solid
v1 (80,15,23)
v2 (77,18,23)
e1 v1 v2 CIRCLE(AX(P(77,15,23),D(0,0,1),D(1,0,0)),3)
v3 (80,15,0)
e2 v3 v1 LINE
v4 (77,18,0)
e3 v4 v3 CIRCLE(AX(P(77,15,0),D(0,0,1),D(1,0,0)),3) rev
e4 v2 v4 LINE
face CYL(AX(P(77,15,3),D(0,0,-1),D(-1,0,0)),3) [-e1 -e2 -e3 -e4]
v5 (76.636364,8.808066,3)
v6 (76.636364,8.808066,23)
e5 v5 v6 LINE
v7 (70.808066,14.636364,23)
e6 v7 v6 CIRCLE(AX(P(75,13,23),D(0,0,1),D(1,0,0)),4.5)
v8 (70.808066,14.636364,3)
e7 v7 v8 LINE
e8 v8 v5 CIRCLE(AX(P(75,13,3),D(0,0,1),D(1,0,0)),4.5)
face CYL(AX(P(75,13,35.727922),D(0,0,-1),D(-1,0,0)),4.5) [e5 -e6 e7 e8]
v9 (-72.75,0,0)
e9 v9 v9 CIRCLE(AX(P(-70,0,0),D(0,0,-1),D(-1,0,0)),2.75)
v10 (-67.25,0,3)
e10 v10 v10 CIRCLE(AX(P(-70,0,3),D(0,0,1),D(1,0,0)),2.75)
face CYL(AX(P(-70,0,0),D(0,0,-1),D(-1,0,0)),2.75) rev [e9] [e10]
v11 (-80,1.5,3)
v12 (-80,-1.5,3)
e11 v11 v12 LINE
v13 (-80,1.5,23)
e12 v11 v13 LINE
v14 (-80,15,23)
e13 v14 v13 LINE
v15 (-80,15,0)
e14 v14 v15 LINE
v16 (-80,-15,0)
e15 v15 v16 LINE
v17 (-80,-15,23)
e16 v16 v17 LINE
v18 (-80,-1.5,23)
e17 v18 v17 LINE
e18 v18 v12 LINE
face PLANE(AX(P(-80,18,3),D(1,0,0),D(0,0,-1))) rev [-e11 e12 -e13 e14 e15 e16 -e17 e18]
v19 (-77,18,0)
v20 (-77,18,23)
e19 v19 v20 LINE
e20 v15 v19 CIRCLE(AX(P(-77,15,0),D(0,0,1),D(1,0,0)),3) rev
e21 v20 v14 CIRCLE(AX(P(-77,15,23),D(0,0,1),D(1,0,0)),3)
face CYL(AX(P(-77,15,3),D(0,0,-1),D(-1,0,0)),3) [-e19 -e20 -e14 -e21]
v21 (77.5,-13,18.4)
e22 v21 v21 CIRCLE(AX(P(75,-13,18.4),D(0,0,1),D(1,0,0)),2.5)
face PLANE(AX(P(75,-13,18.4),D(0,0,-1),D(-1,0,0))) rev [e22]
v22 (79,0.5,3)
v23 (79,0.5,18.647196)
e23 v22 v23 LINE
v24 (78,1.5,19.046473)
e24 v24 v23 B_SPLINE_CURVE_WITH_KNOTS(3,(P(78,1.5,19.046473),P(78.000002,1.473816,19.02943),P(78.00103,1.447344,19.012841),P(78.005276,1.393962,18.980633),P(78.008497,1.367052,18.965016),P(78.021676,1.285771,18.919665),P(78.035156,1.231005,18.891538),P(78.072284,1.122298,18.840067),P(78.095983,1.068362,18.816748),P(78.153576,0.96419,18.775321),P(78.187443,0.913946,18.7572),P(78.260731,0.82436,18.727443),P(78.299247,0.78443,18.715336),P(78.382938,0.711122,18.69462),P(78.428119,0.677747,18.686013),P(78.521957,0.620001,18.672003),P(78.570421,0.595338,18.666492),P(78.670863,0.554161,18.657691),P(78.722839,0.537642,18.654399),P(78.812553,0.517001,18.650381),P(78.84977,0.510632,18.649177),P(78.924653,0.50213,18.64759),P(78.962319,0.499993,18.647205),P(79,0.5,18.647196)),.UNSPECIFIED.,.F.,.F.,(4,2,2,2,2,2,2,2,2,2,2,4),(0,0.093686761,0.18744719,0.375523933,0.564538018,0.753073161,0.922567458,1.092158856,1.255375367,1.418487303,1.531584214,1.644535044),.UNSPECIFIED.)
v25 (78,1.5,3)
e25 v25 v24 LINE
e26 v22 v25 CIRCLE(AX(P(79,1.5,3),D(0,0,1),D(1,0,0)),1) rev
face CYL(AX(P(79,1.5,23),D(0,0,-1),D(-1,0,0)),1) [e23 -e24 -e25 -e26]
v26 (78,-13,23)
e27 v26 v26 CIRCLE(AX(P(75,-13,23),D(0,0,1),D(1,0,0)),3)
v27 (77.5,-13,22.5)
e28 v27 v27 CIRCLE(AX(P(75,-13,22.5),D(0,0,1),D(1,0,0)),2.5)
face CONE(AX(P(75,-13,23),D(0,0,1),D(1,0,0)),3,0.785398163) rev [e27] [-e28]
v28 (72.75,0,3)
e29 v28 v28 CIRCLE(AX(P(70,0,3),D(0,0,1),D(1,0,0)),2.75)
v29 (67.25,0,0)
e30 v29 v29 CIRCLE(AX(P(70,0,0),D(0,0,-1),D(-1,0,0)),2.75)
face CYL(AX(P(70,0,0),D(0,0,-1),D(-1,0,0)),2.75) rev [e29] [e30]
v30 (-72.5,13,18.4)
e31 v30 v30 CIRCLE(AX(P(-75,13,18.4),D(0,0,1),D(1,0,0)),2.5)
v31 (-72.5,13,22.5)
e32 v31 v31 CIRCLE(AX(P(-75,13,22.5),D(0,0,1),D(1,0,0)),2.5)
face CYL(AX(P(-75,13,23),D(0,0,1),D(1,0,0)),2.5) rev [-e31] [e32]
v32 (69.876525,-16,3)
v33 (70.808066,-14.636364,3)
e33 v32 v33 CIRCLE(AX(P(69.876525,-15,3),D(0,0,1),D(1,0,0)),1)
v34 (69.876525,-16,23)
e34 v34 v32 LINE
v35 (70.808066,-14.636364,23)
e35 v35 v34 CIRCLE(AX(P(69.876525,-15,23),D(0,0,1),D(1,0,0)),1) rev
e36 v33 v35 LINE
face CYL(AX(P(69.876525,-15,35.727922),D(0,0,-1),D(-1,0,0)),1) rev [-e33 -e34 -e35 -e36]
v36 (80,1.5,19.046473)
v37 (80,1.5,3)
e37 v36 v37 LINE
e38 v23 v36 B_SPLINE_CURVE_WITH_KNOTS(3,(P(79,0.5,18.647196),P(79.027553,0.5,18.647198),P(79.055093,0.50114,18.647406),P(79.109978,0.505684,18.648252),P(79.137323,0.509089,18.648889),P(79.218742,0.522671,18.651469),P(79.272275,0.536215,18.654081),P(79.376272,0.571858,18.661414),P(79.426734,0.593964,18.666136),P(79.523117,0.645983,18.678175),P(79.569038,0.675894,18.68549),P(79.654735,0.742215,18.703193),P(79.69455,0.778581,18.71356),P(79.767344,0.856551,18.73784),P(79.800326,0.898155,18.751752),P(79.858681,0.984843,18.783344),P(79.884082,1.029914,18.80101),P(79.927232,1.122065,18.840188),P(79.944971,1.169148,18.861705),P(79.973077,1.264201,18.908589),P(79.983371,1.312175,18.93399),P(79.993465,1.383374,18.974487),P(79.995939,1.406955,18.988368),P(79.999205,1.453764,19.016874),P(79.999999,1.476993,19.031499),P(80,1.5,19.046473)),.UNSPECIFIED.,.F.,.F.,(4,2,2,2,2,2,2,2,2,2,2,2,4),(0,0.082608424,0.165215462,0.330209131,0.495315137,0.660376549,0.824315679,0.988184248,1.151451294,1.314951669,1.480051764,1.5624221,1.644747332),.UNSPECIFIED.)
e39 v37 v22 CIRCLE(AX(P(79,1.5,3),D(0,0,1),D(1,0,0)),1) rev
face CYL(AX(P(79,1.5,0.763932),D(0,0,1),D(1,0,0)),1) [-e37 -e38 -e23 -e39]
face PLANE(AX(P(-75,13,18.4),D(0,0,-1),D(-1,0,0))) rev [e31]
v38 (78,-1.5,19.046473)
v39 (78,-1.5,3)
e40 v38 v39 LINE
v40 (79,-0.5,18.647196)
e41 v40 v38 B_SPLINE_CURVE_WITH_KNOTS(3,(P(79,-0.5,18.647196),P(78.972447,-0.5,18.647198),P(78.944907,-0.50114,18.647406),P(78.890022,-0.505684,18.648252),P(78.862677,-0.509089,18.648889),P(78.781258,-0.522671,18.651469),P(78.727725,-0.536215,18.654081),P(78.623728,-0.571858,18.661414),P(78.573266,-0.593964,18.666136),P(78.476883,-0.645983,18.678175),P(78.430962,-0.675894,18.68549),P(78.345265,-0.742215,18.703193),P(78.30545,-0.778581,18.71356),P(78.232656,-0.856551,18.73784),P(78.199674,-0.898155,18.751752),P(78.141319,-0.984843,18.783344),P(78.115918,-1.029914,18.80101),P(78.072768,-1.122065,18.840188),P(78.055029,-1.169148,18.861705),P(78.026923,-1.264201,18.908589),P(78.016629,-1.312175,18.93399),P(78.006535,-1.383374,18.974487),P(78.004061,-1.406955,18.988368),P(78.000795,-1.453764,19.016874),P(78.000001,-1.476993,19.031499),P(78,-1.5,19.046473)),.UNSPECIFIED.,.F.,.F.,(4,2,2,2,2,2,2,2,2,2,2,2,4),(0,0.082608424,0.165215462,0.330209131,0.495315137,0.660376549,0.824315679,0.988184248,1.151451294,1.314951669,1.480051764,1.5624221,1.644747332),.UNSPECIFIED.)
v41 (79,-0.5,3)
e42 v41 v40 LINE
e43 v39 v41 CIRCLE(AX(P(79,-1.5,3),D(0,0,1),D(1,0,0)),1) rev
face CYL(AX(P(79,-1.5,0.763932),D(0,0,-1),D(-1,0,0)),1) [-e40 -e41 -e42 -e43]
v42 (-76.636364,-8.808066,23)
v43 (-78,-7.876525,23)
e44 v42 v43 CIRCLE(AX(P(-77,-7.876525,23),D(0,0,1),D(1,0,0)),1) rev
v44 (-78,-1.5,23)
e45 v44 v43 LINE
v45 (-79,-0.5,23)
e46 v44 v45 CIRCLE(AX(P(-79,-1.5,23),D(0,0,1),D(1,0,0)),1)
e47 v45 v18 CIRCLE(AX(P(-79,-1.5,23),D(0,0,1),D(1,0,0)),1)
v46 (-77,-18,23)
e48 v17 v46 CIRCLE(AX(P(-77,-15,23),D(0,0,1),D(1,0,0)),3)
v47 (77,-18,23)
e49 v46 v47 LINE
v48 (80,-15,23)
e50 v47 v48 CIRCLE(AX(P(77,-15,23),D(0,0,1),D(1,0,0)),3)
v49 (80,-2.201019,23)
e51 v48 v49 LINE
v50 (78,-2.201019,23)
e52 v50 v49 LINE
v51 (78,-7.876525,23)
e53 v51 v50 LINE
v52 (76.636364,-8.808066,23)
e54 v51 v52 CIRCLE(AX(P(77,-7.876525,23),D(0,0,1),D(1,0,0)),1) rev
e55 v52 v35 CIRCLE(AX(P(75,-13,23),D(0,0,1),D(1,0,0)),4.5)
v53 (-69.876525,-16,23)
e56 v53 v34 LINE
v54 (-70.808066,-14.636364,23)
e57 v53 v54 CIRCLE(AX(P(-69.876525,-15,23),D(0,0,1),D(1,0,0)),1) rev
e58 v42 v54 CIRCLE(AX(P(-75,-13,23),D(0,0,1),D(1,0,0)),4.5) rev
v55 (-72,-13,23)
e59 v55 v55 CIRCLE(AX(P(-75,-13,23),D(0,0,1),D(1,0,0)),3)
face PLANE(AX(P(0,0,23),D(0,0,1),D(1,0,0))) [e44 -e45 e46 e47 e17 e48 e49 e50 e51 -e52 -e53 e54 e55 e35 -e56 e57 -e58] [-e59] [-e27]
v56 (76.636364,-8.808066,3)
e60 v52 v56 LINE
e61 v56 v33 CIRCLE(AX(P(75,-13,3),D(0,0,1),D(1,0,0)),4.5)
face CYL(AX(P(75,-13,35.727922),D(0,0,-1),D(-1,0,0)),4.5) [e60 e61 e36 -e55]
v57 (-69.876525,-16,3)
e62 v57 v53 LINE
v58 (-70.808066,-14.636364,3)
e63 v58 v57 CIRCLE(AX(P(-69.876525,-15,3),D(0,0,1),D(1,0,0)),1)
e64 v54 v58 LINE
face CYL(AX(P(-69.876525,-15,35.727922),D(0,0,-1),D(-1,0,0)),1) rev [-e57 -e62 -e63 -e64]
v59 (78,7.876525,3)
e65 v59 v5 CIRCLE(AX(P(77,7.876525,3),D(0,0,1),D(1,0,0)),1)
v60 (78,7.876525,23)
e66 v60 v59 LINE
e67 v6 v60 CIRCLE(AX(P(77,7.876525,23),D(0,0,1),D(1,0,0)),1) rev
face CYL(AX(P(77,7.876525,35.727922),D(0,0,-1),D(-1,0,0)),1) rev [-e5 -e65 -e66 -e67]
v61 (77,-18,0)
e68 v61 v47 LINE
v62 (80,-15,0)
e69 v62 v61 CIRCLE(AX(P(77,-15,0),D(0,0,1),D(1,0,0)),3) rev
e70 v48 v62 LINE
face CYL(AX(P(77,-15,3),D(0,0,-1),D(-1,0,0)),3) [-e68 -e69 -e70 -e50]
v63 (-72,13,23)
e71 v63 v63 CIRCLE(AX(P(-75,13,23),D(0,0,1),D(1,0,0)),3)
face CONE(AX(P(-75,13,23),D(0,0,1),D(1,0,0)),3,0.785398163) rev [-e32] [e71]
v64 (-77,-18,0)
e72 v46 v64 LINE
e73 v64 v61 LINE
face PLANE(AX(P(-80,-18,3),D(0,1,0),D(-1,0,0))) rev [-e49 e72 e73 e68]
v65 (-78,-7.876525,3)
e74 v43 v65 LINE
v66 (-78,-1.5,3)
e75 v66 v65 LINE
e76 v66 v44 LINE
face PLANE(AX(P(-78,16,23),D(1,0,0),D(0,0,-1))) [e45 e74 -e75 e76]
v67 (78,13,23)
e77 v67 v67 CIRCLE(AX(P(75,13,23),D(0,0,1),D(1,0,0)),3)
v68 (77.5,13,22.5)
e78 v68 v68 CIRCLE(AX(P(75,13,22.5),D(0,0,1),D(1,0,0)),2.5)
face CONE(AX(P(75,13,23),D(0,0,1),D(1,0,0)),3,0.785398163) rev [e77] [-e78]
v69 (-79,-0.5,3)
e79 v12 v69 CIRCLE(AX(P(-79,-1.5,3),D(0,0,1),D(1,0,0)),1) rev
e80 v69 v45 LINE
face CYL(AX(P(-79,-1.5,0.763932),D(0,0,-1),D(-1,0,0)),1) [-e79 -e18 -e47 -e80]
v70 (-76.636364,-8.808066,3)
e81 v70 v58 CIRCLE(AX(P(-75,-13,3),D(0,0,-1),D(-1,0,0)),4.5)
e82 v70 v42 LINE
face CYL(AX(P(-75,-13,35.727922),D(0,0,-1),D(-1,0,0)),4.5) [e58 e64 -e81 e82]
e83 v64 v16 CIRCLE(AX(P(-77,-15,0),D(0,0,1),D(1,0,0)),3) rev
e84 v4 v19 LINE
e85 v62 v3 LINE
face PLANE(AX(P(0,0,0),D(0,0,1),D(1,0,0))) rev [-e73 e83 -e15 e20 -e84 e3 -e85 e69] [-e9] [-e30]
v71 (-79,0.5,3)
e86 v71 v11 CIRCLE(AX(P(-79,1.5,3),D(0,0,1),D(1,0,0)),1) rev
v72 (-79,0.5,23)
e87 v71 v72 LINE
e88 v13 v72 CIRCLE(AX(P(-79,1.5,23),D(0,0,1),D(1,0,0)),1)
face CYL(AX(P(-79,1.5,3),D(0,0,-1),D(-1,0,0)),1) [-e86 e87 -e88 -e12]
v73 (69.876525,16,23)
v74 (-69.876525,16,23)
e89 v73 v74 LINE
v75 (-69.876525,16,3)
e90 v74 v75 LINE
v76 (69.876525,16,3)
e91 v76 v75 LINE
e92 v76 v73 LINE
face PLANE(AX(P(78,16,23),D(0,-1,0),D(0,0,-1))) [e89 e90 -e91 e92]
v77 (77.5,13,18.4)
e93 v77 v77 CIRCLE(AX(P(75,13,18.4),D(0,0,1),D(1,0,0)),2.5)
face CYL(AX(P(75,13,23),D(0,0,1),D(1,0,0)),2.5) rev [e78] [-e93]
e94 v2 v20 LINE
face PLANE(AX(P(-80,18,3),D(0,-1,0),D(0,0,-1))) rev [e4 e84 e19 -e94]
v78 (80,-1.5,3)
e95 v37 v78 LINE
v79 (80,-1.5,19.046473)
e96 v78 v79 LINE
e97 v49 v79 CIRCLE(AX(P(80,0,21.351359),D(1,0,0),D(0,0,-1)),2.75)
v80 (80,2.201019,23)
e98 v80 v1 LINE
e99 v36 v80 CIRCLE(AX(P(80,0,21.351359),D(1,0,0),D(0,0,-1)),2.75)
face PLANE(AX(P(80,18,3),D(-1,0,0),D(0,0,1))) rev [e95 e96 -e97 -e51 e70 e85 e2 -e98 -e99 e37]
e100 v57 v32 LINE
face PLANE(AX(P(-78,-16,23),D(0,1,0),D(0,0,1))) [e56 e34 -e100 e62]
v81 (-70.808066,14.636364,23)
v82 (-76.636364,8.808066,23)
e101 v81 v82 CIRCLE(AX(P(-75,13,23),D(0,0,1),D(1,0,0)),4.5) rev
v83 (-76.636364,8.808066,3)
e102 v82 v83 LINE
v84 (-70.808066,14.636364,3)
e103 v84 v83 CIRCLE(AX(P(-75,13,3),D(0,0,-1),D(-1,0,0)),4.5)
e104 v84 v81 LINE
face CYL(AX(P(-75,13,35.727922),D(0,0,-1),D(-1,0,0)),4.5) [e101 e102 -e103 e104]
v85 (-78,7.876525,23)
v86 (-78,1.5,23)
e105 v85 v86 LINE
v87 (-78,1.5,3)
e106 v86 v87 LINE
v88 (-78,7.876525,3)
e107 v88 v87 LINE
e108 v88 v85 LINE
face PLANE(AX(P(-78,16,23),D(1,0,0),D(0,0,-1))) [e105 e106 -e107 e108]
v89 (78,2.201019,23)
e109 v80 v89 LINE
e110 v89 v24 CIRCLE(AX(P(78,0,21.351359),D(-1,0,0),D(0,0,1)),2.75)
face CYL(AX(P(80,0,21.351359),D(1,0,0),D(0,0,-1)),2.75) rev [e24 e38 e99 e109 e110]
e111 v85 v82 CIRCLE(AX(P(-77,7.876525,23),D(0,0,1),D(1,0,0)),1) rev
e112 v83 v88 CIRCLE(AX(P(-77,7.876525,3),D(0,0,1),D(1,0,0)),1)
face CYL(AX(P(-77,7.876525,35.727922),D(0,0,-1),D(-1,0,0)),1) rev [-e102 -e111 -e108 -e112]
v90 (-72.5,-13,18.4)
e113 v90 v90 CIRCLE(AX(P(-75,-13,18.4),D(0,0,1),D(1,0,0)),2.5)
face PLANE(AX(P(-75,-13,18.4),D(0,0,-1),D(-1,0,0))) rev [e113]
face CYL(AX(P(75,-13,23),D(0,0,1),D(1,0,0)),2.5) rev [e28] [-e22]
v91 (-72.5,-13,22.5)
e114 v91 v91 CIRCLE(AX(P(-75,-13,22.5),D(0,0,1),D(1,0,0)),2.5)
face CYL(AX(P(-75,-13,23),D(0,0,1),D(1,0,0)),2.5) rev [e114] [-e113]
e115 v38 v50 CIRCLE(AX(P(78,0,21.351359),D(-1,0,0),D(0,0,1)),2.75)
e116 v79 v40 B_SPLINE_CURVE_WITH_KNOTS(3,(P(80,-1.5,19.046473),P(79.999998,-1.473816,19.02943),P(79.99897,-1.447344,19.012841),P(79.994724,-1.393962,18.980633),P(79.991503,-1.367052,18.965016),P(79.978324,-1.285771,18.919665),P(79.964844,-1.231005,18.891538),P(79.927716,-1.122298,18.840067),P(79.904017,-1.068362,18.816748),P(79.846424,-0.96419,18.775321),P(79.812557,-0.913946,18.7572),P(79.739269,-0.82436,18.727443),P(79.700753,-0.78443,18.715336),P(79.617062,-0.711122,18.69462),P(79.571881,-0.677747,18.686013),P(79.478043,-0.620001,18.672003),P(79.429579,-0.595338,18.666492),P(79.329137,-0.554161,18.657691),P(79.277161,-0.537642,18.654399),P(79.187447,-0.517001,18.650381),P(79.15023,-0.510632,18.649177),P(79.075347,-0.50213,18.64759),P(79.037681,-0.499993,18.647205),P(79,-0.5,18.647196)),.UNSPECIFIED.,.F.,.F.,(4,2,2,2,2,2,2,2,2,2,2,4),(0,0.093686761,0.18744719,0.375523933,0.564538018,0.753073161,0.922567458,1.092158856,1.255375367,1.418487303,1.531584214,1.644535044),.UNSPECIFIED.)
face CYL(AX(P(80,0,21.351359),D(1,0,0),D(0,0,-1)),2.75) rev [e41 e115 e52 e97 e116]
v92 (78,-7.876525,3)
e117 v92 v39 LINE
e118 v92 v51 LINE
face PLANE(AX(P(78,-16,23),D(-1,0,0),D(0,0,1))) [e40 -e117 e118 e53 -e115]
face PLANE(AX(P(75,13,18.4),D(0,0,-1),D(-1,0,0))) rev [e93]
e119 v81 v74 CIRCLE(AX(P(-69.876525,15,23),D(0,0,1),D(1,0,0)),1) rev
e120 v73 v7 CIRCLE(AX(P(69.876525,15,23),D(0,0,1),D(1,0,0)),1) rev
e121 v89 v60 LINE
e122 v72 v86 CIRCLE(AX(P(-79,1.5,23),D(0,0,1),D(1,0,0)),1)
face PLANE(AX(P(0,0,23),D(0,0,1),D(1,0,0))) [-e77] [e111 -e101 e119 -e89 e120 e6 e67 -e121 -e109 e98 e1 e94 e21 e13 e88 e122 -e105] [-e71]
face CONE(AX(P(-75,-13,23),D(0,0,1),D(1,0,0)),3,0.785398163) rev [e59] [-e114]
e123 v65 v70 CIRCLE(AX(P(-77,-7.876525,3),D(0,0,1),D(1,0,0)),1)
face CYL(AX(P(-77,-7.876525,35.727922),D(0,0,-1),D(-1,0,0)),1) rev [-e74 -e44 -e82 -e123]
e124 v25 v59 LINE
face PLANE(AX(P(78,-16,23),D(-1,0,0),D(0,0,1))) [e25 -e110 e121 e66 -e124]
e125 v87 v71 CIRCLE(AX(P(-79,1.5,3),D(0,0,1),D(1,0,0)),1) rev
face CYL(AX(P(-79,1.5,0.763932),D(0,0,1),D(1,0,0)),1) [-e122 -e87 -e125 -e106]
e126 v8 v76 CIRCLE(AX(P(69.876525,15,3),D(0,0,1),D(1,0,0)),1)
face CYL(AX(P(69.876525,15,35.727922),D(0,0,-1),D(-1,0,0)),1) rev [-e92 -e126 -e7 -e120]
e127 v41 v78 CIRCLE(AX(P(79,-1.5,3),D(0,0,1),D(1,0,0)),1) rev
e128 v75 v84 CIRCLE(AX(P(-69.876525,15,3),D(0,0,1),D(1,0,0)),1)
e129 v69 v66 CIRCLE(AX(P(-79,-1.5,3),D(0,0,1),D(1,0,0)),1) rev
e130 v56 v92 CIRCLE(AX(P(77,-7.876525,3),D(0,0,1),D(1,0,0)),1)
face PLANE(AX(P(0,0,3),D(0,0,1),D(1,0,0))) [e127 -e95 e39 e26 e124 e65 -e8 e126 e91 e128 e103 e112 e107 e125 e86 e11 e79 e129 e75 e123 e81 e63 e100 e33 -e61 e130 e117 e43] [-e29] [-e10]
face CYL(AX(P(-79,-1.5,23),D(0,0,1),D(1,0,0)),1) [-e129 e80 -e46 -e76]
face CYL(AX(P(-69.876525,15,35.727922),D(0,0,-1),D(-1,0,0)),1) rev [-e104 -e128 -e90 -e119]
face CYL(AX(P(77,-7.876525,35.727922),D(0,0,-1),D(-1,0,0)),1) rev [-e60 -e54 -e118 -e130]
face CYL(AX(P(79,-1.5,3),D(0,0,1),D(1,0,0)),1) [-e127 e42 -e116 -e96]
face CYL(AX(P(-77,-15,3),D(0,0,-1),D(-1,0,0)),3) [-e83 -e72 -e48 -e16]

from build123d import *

# Parameters (mm, degrees)
SKETCH1_W                       = 160
SKETCH1_H                       = 36
BOSS_EXTRUDE1_DEPTH             = 3
SKETCH3_W                       = 160
SKETCH3_H                       = 36
SKETCH3_W_2                     = 156
SKETCH3_H_2                     = 32
BOSS_EXTRUDE3_DEPTH             = 20
SKETCH4_W                       = 2
SKETCH4_H                       = 1
CUT_EXTRUDE1_DEPTH              = 20
SKETCH5_R                       = 4.5
BOSS_EXTRUDE4_DEPTH             = 20
F_5_0MM_DOWEL_HOLE1_D           = 5
F_5_0MM_DOWEL_HOLE1_DEPTH       = 4.6
F_5_0MM_DOWEL_HOLE1_CSINK_D     = 6
F_5_0MM_DOWEL_HOLE1_CSINK_ANGLE = 90
FILLET3_R                       = 3
M5_CLEARANCE_HOLE2_D            = 5.5
FILLET4_R                       = 1
M5_CLEARANCE_HOLE3_D            = 5.5
M5_CLEARANCE_HOLE3_DEPTH        = 10
M5_CLEARANCE_HOLE3_TIP          = 1.652366702


with BuildPart() as part:
    # Sketch1 → Boss-Extrude1 (new body)
    with BuildSketch(Plane.XY):
        Rectangle(SKETCH1_W, SKETCH1_H)
    extrude(amount=BOSS_EXTRUDE1_DEPTH)

    # Sketch3 → Boss-Extrude3 (add)
    with BuildSketch(Plane.XY.offset(3)):
        Rectangle(SKETCH3_W, SKETCH3_H)
        Rectangle(SKETCH3_W_2, SKETCH3_H_2, mode=Mode.SUBTRACT)
    extrude(amount=BOSS_EXTRUDE3_DEPTH)

    # Sketch4 → Cut-Extrude1 (cut)
    with BuildSketch(Plane.XY.offset(23)):
        with Locations((79, 0)):
            Rectangle(SKETCH4_W, SKETCH4_H)
    cut_extrude1 = extrude(amount=-CUT_EXTRUDE1_DEPTH, mode=Mode.SUBTRACT)

    # Sketch5 → Boss-Extrude4 (add)
    with BuildSketch(Plane.XY.offset(3)):
        with Locations((75, 13)):
            Circle(SKETCH5_R)
        with Locations((75, -13)):
            Circle(SKETCH5_R)
    boss_extrude4 = extrude(amount=BOSS_EXTRUDE4_DEPTH)

    # Ø5.0mm Dowel Hole1
    with Locations(Plane.XY.offset(23)):
        with Locations((75, 13), (75, -13)):
            f_5_0mm_dowel_hole1 = CounterSinkHole(F_5_0MM_DOWEL_HOLE1_D / 2, F_5_0MM_DOWEL_HOLE1_CSINK_D / 2, depth=F_5_0MM_DOWEL_HOLE1_DEPTH, counter_sink_angle=F_5_0MM_DOWEL_HOLE1_CSINK_ANGLE)

    # Fillet3
    fillet3_edges = [part.edges().sort_by_distance(p)[0] for p in [
        (-80, 18, 11.5),
        (80, 18, 11.5),
        (80, -18, 11.5),
        (-80, -18, 11.5),
    ]]
    fillet(fillet3_edges, radius=FILLET3_R)

    # M5 Clearance Hole2 (through all)
    with Locations(Plane(origin=(0, 0, 0), x_dir=(-1, 0, 0), z_dir=(0, 0, -1))):
        with Locations((-70, 0), (70, 0)):
            m5_clearance_hole2 = Hole(M5_CLEARANCE_HOLE2_D / 2)

    # Mirror2: Cut-Extrude1, Boss-Extrude4, Ø5.0mm Dowel Hole1, M5 Clearance Hole2 across plane
    add(cut_extrude1.mirror(Plane(origin=(0, 0, 0), x_dir=(0, 0, 1), z_dir=(1, 0, 0))), mode=Mode.SUBTRACT)
    add(boss_extrude4.mirror(Plane(origin=(0, 0, 0), x_dir=(0, 0, 1), z_dir=(1, 0, 0))))
    add(f_5_0mm_dowel_hole1.mirror(Plane(origin=(0, 0, 0), x_dir=(0, 0, 1), z_dir=(1, 0, 0))), mode=Mode.SUBTRACT)
    add(m5_clearance_hole2.mirror(Plane(origin=(0, 0, 0), x_dir=(0, 0, 1), z_dir=(1, 0, 0))), mode=Mode.SUBTRACT)

    # Fillet4
    fillet4_edges = [part.edges().sort_by_distance(p)[0] for p in [
        (-78, -9.645898034, 13),
        (-78, -0.5, 13),
        (-80, -0.5, 13),
        (-80, 0.5, 13),
        (-78, 0.5, 13),
        (-78, 9.645898034, 13),
        (-71.645898034, 16, 13),
        (71.645898034, 16, 13),
        (78, 0.5, 13),
        (80, 0.5, 13),
        (80, -0.5, 13),
        (78, -0.5, 13),
        (78, -9.645898034, 13),
        (71.645898034, -16, 13),
        (-71.645898034, -16, 13),
        (78, 9.645898034, 13),
    ]]
    fillet(fillet4_edges, radius=FILLET4_R - 0.0001)  # a hair under: the kernel refuses the full size

    # M5 Clearance Hole3
    with Locations(Plane(origin=(80, 0, 0), x_dir=(0, 0, -1), z_dir=(1, 0, 0))):
        with Locations((-21.351359234, 0)):
            Hole(M5_CLEARANCE_HOLE3_D / 2, depth=M5_CLEARANCE_HOLE3_DEPTH)
            with Locations((0, 0, -(M5_CLEARANCE_HOLE3_DEPTH + M5_CLEARANCE_HOLE3_TIP / 2))):  # 118° drill point
                Cone(0, M5_CLEARANCE_HOLE3_D / 2, M5_CLEARANCE_HOLE3_TIP, mode=Mode.SUBTRACT)


solid = part.part
